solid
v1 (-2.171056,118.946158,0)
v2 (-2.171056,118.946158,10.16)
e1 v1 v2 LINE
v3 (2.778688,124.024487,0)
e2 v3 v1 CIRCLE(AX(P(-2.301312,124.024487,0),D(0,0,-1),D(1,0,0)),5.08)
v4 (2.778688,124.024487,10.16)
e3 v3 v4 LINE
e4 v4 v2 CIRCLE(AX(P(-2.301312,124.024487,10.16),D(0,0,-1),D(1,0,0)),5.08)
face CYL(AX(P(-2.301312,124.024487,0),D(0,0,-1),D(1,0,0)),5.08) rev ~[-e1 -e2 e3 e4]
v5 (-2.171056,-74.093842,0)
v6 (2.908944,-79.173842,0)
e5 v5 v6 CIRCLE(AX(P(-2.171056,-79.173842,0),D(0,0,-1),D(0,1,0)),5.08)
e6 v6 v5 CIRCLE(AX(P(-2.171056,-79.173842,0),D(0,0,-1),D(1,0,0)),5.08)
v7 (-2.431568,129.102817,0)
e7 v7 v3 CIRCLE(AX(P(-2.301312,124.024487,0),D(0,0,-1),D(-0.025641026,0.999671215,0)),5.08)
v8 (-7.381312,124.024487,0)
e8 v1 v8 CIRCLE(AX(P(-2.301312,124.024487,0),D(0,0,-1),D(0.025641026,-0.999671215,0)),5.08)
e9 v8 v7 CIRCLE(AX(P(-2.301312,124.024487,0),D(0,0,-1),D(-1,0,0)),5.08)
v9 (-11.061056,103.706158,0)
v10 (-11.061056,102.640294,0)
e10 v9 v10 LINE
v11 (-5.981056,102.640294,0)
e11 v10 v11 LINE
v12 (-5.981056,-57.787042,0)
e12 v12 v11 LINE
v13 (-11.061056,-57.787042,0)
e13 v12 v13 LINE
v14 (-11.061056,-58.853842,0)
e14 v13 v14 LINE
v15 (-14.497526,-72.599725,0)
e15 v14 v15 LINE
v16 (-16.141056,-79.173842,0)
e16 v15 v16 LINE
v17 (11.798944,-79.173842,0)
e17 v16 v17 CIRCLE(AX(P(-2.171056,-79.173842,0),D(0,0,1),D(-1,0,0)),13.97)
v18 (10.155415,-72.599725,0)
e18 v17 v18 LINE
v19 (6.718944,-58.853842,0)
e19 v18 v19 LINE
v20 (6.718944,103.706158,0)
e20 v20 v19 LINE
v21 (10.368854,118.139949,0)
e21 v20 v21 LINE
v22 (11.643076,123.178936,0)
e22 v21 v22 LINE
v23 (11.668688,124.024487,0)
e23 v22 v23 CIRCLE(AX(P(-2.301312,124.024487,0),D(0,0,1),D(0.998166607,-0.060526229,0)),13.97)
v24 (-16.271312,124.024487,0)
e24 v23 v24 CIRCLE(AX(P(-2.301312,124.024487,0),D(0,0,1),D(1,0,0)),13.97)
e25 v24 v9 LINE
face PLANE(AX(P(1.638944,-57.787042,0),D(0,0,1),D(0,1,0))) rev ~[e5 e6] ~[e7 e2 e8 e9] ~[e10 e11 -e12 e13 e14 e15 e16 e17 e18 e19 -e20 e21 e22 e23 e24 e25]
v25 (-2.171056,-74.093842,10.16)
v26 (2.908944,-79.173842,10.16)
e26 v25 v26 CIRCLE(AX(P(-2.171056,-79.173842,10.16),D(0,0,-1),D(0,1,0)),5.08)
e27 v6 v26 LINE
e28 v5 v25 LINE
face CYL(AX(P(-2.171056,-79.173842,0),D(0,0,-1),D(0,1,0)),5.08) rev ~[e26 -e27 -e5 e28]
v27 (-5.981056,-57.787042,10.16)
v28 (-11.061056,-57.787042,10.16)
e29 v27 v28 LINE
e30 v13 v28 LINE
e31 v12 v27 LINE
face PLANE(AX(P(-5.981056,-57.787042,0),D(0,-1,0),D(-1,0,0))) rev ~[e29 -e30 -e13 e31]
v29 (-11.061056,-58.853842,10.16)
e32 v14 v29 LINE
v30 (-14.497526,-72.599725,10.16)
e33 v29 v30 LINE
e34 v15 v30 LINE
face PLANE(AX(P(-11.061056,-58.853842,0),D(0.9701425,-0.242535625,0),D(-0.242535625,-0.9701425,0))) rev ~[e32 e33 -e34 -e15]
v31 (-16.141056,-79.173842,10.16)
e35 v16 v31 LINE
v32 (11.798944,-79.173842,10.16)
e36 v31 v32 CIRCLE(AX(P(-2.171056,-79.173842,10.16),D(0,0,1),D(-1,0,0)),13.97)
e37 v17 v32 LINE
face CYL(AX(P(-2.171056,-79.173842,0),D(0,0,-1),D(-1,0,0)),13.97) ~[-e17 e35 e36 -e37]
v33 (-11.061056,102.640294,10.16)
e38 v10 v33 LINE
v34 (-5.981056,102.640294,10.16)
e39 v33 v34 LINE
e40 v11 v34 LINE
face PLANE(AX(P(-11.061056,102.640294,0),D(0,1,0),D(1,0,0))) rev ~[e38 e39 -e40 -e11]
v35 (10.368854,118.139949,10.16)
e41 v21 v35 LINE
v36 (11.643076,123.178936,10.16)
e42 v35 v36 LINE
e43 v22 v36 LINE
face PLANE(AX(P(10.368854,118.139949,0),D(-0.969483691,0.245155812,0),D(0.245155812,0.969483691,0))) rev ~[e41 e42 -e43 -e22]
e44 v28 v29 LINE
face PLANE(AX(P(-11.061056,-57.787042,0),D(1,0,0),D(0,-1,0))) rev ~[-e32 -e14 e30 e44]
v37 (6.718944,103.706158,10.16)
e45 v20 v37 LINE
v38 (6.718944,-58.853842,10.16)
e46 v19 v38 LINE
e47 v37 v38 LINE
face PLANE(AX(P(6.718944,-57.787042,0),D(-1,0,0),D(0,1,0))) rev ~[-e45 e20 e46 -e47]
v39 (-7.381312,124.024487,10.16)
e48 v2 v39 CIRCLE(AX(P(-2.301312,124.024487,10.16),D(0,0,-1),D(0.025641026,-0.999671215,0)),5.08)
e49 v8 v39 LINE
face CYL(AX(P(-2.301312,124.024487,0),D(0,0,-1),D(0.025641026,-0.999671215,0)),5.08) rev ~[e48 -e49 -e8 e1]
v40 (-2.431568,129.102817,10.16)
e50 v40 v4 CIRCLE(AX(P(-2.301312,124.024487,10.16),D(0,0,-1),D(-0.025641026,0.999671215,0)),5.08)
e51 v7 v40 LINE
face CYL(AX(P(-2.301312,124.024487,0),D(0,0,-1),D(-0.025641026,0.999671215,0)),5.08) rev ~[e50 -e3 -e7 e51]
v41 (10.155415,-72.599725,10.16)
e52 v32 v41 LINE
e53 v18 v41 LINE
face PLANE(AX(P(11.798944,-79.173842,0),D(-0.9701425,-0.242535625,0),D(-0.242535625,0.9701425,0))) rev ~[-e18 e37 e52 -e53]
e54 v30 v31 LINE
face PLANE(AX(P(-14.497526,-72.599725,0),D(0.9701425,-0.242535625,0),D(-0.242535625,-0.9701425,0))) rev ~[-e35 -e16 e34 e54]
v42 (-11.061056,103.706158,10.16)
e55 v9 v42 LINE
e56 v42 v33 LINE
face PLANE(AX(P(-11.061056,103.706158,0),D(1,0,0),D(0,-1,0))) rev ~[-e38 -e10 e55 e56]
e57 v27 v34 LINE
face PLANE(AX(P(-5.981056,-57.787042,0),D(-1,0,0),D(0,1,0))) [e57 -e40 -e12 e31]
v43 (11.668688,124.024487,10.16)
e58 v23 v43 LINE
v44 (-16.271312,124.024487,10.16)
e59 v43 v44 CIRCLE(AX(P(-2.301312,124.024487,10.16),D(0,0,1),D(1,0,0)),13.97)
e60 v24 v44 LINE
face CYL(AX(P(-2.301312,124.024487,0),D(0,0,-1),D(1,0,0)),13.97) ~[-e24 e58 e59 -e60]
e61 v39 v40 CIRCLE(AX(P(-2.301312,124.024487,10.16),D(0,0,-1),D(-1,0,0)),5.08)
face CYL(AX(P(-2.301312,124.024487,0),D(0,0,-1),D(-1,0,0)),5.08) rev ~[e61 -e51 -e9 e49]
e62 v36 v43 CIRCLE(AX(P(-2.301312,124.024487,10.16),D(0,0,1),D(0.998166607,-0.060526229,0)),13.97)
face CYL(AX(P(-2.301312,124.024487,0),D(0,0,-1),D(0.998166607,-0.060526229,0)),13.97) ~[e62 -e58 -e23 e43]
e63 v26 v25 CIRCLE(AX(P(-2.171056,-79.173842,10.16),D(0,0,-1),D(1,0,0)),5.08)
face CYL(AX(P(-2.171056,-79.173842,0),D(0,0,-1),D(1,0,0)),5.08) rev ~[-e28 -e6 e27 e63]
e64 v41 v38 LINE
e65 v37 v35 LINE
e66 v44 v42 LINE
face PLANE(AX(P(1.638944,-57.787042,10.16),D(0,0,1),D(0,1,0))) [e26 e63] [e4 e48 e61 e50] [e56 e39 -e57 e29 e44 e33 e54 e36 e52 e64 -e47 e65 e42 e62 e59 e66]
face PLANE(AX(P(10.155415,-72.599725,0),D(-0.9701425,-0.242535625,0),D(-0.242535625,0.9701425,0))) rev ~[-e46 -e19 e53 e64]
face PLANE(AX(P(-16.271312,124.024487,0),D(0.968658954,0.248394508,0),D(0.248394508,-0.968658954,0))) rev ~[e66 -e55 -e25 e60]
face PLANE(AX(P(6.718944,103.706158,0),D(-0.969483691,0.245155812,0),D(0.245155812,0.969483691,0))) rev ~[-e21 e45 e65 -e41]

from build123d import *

# Parameters (mm, degrees)
F0_W     = 1.8361258607
F0_H     = 1.0668
F0_W_2   = 7.62
F0_H_2   = 160.4273358566
F1_DEPTH = 10.16
F2_DEPTH = 5.08


with BuildPart() as f1:
    # F0 (on Top) → F1 (new body)
    with BuildSketch(Plane.XY):
        Polygon((6.7189444143, 102.6402935386), (6.7189444143, 103.7061576819), (-2.1710555857, 103.7061576819), (-11.0610555857, 103.7061576819), (-11.0610555857, 102.6402935386), (-5.9810555857, 102.6402935386), (1.6389444143, 102.6402935386), align=None)
        with BuildLine():
            Line((-2.1710555857, 103.7061576819), (6.7189444143, 103.7061576819))
            Line((6.7189444143, 103.7061576819), (10.3688539856, 118.139948899))
            ThreePointArc((10.3688539856, 118.139948899), (5.2686232822, 112.2832362473), (-2.1710555857, 110.0550947226))
            Line((-2.1710555857, 110.0550947226), (-2.1710555857, 103.7061576819))
        make_face()
        with BuildLine():
            Line((-11.0610555857, 103.7061576819), (-2.1710555857, 103.7061576819))
            Line((-2.1710555857, 103.7061576819), (-2.1710555857, 110.0550947226))
            ThreePointArc((-2.1710555857, 110.0550947226), (-9.3601607133, 111.9690507219), (-14.5474187039, 117.301856235))
            Line((-14.5474187039, 117.301856235), (-11.0610555857, 103.7061576819))
        make_face()
        with BuildLine():
            ThreePointArc((-2.1710555857, 110.0550947226), (5.2686232822, 112.2832362473), (10.3688539856, 118.139948899))
            Line((10.3688539856, 118.139948899), (11.6430755059, 123.1789360379))
            ThreePointArc((11.6430755059, 123.1789360379), (11.6622834114, 123.6015178338), (11.668688004, 124.0244874534))
            Line((11.668688004, 124.0244874534), (2.778688004, 124.0244874534))
            ThreePointArc((2.778688004, 124.0244874534), (1.3365515641, 120.4787366559), (-2.1710555857, 118.9461576819))
            Line((-2.1710555857, 118.9461576819), (-2.1710555857, 110.0550947226))
        make_face()
        with Locations((5.8008814839, -58.3204423181)):
            Rectangle(F0_W, F0_H)
        with Locations((-2.1710555857, 22.4266256103)):
            Rectangle(F0_W_2, F0_H_2)
        with BuildLine():
            ThreePointArc((-14.5474187039, 117.301856235), (-9.3601607133, 111.9690507219), (-2.1710555857, 110.0550947226))
            Line((-2.1710555857, 110.0550947226), (-2.1710555857, 118.9461576819))
            ThreePointArc((-2.1710555857, 118.9461576819), (-5.8470627935, 120.3866238933), (-7.381311996, 124.0244874534))
            Line((-7.381311996, 124.0244874534), (-16.271311996, 124.0244874534))
            Line((-16.271311996, 124.0244874534), (-14.5474187039, 117.301856235))
        make_face()
        with BuildLine():
            Line((10.1554150025, -72.599724671), (6.7189444143, -58.8538423181))
            Line((6.7189444143, -58.8538423181), (4.8828185536, -58.8538423181))
            Line((4.8828185536, -58.8538423181), (-2.1710555857, -58.8538423181))
            Line((-2.1710555857, -58.8538423181), (-2.1710555857, -65.2038423181))
            ThreePointArc((-2.1710555857, -65.2038423181), (5.0164501176, -67.1946661459), (10.1554150025, -72.599724671))
        make_face()
        Polygon((4.8828185536, -58.8538423181), (4.8828185536, -57.7870423181), (1.6389444143, -57.7870423181), (-5.9810555857, -57.7870423181), (-11.0610555857, -57.7870423181), (-11.0610555857, -58.8538423181), (-2.1710555857, -58.8538423181), align=None)
        with BuildLine():
            Line((2.778688004, 124.0244874534), (11.668688004, 124.0244874534))
            ThreePointArc((11.668688004, 124.0244874534), (-2.301311996, 137.9944874534), (-16.271311996, 124.0244874534))
            Line((-16.271311996, 124.0244874534), (-7.381311996, 124.0244874534))
            ThreePointArc((-7.381311996, 124.0244874534), (-5.9391755561, 127.5702382509), (-2.4315684063, 129.1028172248))
            ThreePointArc((-2.4315684063, 129.1028172248), (1.2444388015, 127.6623510135), (2.778688004, 124.0244874534))
        make_face()
        with BuildLine():
            Line((11.7989444143, -79.1738423181), (10.1554150025, -72.599724671))
            ThreePointArc((10.1554150025, -72.599724671), (5.0164501176, -67.1946661459), (-2.1710555857, -65.2038423181))
            ThreePointArc((-2.1710555857, -65.2038423181), (-9.3585612891, -67.1946661459), (-14.497526174, -72.599724671))
            Line((-14.497526174, -72.599724671), (-16.1410555857, -79.1738423181))
            ThreePointArc((-16.1410555857, -79.1738423181), (-2.1710555857, -93.1438423181), (11.7989444143, -79.1738423181))
        make_face()
        with BuildLine():
            ThreePointArc((2.9089444143, -79.1738423181), (-5.7631580342, -82.7659447665), (-2.1710555857, -74.0938423181))
            ThreePointArc((-2.1710555857, -74.0938423181), (1.4210468627, -75.5817398696), (2.9089444143, -79.1738423181))
        make_face(mode=Mode.SUBTRACT)
        with BuildLine():
            Line((-2.1710555857, -65.2038423181), (-2.1710555857, -58.8538423181))
            Line((-2.1710555857, -58.8538423181), (-11.0610555857, -58.8538423181))
            Line((-11.0610555857, -58.8538423181), (-14.497526174, -72.599724671))
            ThreePointArc((-14.497526174, -72.599724671), (-9.3585612891, -67.1946661459), (-2.1710555857, -65.2038423181))
        make_face()
    extrude(amount=F1_DEPTH)

    # F2 (add): a face of the model
    f2_faces = [f1.faces().sort_by_distance(p)[0] for p in [
        (1.6389444143, 22.4266256103, 5.08),
    ]]
    extrude(f2_faces, amount=F2_DEPTH)


solid = f1.part
